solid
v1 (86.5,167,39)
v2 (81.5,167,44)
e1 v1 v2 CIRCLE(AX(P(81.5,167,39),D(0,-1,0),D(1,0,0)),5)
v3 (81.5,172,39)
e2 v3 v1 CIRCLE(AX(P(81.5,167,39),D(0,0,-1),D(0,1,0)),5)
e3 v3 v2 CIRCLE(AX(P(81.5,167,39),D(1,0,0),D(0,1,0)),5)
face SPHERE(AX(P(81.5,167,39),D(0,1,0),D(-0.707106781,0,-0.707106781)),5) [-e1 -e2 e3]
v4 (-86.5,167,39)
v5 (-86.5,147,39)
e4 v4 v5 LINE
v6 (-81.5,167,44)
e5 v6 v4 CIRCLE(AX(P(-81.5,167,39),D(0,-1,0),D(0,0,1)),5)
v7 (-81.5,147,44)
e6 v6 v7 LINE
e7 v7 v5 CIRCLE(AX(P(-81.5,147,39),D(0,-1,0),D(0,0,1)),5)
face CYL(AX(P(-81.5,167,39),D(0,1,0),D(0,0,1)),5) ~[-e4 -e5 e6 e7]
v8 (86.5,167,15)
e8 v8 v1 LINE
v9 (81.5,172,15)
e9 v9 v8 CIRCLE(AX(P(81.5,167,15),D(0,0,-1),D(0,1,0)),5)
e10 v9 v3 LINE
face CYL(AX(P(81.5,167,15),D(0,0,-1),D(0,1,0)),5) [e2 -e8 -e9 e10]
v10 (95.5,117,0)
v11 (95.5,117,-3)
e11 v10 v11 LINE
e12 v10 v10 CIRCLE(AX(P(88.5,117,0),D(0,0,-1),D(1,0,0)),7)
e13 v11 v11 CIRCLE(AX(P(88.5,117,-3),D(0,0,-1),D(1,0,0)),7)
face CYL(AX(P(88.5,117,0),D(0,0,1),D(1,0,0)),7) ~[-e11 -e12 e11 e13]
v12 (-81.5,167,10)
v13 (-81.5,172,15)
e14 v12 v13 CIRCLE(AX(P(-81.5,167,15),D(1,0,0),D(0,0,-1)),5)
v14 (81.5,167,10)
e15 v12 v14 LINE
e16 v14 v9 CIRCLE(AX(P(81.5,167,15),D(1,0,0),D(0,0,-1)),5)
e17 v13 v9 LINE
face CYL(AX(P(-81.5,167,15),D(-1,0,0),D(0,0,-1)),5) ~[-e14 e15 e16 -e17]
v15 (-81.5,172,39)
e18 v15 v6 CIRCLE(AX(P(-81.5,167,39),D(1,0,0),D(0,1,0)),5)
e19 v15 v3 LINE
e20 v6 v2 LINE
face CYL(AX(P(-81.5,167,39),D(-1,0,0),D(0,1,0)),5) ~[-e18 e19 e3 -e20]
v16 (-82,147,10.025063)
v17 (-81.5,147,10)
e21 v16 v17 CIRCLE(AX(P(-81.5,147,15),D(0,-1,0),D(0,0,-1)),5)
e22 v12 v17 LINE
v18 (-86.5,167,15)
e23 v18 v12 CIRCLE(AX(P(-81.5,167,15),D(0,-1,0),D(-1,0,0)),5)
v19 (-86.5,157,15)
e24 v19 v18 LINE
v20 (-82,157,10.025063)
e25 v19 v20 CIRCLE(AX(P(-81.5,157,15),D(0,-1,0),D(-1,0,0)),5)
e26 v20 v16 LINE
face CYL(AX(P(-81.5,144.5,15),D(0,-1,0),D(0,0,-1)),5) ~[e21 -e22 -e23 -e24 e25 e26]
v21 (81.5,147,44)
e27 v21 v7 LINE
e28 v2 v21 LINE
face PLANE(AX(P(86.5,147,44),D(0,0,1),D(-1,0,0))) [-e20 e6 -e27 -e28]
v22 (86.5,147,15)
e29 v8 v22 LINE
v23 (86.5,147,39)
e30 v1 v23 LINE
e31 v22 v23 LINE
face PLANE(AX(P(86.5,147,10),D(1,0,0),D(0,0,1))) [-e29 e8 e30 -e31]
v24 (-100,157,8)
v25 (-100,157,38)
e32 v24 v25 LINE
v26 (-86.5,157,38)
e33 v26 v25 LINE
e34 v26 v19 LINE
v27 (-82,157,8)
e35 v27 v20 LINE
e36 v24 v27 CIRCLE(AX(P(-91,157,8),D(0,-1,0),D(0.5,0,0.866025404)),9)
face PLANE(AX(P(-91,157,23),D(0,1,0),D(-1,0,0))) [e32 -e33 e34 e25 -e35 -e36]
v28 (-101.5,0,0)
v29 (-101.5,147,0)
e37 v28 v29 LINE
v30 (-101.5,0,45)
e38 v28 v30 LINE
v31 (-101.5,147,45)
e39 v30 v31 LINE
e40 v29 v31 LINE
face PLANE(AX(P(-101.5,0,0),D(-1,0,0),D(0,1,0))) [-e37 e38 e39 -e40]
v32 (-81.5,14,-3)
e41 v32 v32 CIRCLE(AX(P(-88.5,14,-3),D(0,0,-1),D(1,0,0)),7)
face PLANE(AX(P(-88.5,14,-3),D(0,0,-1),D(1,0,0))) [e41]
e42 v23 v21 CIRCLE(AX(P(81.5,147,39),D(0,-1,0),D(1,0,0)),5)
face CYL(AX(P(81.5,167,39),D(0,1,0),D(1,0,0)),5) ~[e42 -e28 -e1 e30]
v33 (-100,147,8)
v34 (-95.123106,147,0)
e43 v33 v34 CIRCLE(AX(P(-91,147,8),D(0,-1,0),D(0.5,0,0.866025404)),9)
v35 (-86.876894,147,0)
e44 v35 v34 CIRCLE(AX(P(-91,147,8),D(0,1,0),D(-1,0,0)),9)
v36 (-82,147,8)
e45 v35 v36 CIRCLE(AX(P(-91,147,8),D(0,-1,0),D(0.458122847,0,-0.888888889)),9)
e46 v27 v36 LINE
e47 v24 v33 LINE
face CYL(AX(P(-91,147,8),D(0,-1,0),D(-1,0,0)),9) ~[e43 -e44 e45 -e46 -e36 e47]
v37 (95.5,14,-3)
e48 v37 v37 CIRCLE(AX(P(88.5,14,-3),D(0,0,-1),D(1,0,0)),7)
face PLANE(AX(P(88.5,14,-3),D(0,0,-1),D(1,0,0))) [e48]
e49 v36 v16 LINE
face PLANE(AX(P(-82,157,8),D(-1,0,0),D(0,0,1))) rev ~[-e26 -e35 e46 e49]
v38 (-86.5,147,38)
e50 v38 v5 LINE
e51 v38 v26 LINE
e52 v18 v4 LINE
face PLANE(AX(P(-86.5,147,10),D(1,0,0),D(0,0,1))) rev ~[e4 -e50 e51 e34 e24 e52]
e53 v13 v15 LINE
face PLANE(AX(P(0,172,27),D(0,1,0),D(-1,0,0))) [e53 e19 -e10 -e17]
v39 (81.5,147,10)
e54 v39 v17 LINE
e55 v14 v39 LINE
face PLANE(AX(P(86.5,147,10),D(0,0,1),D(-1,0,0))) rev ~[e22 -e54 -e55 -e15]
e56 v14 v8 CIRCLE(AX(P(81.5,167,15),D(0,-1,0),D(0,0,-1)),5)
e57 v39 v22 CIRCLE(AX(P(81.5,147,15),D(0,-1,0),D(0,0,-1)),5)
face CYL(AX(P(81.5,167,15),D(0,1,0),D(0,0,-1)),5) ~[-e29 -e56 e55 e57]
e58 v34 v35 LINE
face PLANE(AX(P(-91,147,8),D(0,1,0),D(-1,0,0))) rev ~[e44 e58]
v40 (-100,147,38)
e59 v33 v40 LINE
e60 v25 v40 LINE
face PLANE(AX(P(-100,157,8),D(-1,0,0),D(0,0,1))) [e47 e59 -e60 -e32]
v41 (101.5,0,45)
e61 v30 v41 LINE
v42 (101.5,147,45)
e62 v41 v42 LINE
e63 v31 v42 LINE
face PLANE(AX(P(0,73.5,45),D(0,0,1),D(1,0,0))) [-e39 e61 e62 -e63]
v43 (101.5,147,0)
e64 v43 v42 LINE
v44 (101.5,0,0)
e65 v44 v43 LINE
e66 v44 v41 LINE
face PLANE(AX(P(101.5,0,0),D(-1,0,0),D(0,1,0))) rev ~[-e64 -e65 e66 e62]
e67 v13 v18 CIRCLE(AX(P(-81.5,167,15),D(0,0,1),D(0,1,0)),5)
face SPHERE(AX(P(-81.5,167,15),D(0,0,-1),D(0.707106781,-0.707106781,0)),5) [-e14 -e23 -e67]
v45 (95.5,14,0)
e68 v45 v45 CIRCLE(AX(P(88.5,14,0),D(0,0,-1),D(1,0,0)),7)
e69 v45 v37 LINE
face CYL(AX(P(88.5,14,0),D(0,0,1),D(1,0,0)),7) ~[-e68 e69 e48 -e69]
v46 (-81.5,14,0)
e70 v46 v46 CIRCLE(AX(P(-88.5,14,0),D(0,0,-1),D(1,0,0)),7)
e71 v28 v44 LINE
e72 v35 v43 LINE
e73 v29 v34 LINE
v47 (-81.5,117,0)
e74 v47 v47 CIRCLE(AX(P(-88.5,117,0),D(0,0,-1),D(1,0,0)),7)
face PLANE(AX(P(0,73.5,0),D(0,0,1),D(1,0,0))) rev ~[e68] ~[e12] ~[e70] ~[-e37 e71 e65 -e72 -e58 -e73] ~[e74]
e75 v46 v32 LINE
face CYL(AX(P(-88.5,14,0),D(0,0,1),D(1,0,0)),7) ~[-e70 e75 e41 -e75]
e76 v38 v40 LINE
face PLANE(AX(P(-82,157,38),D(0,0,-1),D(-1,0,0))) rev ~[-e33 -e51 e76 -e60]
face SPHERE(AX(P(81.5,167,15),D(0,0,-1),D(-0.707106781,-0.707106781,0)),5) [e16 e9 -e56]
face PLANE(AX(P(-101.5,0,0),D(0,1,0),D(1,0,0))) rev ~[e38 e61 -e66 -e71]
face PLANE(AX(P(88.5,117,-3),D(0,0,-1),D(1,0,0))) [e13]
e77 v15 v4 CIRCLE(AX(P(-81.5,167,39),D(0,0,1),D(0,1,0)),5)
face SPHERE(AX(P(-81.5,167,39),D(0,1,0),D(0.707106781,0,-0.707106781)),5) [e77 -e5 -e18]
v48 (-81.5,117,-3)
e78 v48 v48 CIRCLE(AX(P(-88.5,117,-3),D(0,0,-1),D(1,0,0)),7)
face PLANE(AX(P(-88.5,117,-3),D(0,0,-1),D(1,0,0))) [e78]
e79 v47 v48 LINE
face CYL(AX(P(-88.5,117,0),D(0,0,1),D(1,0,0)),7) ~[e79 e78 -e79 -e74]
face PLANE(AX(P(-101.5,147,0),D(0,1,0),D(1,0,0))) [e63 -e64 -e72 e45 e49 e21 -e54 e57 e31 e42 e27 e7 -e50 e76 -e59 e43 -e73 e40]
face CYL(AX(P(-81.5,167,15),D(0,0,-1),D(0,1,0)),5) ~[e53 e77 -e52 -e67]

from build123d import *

# Parameters (mm, degrees)
F0_W         = 203
F0_H         = 147
F1_DEPTH     = 45
F2_R         = 7
F3_DEPTH     = 3
F4_R         = 9
F5_DEPTH     = 10
F6_W         = 173
F6_H         = 34
F7_DEPTH     = 25
F8_T1_DEPTH  = 163
F8_T3_DEPTH  = 24
F8_T5_DEPTH  = 20
F8_S9_W      = 5
F8_S9_H      = 5
F8_T10_DEPTH = 5
F8_S15_W     = 5
F8_S15_H     = 5
F8_T16_DEPTH = 5
F8_S21_W     = 5
F8_S21_H     = 5
F8_T22_DEPTH = 5
F8_S27_W     = 5
F8_S27_H     = 5
F8_T28_DEPTH = 5
F8_T34_DEPTH = 22.5
F8_S36_R     = 9
F8_T37_DEPTH = 13
F8_T42_DEPTH = 10
F8_S43_R     = 9
F8_T44_DEPTH = 8
F8_T48_DEPTH = 10
F8_S49_R     = 9
F8_T50_DEPTH = 8
F9_W         = 18
F9_H         = 30
F10_DEPTH    = 10


# Not quite as in the source:
# - a fillet or chamfer that OpenCascade refuses, or shapes differently, is made with other operations: its cross-section is extruded or revolved along the edge and cut away or added


with BuildPart() as f1:
    # F0 (on Top) → F1 (new body)
    with BuildSketch(Plane.XY):
        with Locations((0, 73.5)):
            Rectangle(F0_W, F0_H)
    extrude(amount=F1_DEPTH)

    # F2 (on face) → F3 (join)
    with BuildSketch(Plane(origin=(0, 0, 0), x_dir=(1, 0, 0), z_dir=(0, 0, -1))):
        with Locations((-88.5, -14)):
            Circle(F2_R)
        with Locations((-88.5, -117)):
            Circle(F2_R)
        with Locations((88.5, -14)):
            Circle(F2_R)
        with Locations((88.5, -117)):
            Circle(F2_R)
    extrude(amount=F3_DEPTH)

    # F4 (on face) → F5 (join)
    with BuildSketch(Plane(origin=(0, 147, 0), x_dir=(-1, 0, 0), z_dir=(0, 1, 0))):
        with Locations((91, 8)):
            Circle(F4_R)
    extrude(amount=F5_DEPTH)

    # F6 (on face) → F7 (join)
    with BuildSketch(Plane(origin=(0, 147, 0), x_dir=(-1, 0, 0), z_dir=(0, 1, 0))):
        with Locations((0, 27)):
            Rectangle(F6_W, F6_H)
    extrude(amount=F7_DEPTH)

    # F8: fillet of radius 5 on 8 edges, made by hand

    # F8_s2 → F8_t1 (cut)
    with BuildSketch(Plane.YZ.offset(-81.5)):
        with BuildLine():
            ThreePointArc((172, 39), (170.5355339059, 42.5355339059), (167, 44))
            Line((167, 44), (172, 44))
            Line((172, 44), (172, 39))
        make_face()
        with BuildLine():
            ThreePointArc((167, 10), (170.5355339059, 11.4644660941), (172, 15))
            Line((172, 15), (172, 10))
            Line((172, 10), (167, 10))
        make_face()
    extrude(amount=F8_T1_DEPTH, mode=Mode.SUBTRACT)

    # F8_s4 → F8_t3 (cut)
    with BuildSketch(Plane.XY.offset(15)):
        with BuildLine():
            ThreePointArc((81.5, 172), (85.0355339059, 170.5355339059), (86.5, 167))
            Line((86.5, 167), (86.5, 172))
            Line((86.5, 172), (81.5, 172))
        make_face()
        with BuildLine():
            ThreePointArc((-81.5, 172), (-85.0355339059, 170.5355339059), (-86.5, 167))
            Line((-86.5, 167), (-86.5, 172))
            Line((-86.5, 172), (-81.5, 172))
        make_face()
    extrude(amount=F8_T3_DEPTH, mode=Mode.SUBTRACT)

    # F8_s6 → F8_t5 (cut)
    with BuildSketch(Plane.XZ.offset(-167)):
        with BuildLine():
            ThreePointArc((86.5, 39), (85.0355339059, 42.5355339059), (81.5, 44))
            Line((81.5, 44), (86.5, 44))
            Line((86.5, 44), (86.5, 39))
        make_face()
        with BuildLine():
            ThreePointArc((81.5, 10), (85.0355339059, 11.4644660941), (86.5, 15))
            Line((86.5, 15), (86.5, 10))
            Line((86.5, 10), (81.5, 10))
        make_face()
        with BuildLine():
            ThreePointArc((-81.5, 44), (-85.0355339059, 42.5355339059), (-86.5, 39))
            Line((-86.5, 39), (-86.5, 44))
            Line((-86.5, 44), (-81.5, 44))
        make_face()
    extrude(amount=F8_T5_DEPTH, mode=Mode.SUBTRACT)


with BuildPart() as f8_tool8:
    # F8_s9 → F8_t10 (new body)
    with BuildSketch(Plane.XZ.offset(-167)):
        with Locations((-84, 41.5)):
            Rectangle(F8_S9_W, F8_S9_H)
    extrude(amount=-F8_T10_DEPTH)

    # F8_s11 → F8_t12 (revolve, cut)
    with BuildSketch(Plane(origin=(-81.5, 167, 39), x_dir=(0.7071067812, 0, -0.7071067812), z_dir=(0.7071067812, 0, 0.7071067812))):
        with BuildLine():
            ThreePointArc((0, -5), (5, 0), (0, 5))
            Line((0, 5), (0, -5))
        make_face()
    revolve(axis=Axis((-81.5, 167, 39), (0, 1, 0)), mode=Mode.SUBTRACT)


with BuildPart() as f1_1:
    add(f1.part)

    # F8_t7: cut F8_tool8
    add(f8_tool8.part, mode=Mode.SUBTRACT)


with BuildPart() as f8_tool14:
    # F8_s15 → F8_t16 (new body)
    with BuildSketch(Plane.XZ.offset(-167)):
        with Locations((84, 41.5)):
            Rectangle(F8_S15_W, F8_S15_H)
    extrude(amount=-F8_T16_DEPTH)

    # F8_s17 → F8_t18 (revolve, cut)
    with BuildSketch(Plane(origin=(81.5, 167, 39), x_dir=(-0.7071067812, 0, -0.7071067812), z_dir=(0.7071067812, 0, -0.7071067812))):
        with BuildLine():
            ThreePointArc((0, -5), (5, 0), (0, 5))
            Line((0, 5), (0, -5))
        make_face()
    revolve(axis=Axis((81.5, 167, 39), (0, 1, 0)), mode=Mode.SUBTRACT)


with BuildPart() as f1_2:
    add(f1_1.part)

    # F8_t13: cut F8_tool14
    add(f8_tool14.part, mode=Mode.SUBTRACT)


with BuildPart() as f8_tool20:
    # F8_s21 → F8_t22 (new body)
    with BuildSketch(Plane.XY.offset(15)):
        with Locations((84, 169.5)):
            Rectangle(F8_S21_W, F8_S21_H)
    extrude(amount=-F8_T22_DEPTH)

    # F8_s23 → F8_t24 (revolve, cut)
    with BuildSketch(Plane(origin=(81.5, 167, 15), x_dir=(-0.7071067812, -0.7071067812, 0), z_dir=(0.7071067812, -0.7071067812, 0))):
        with BuildLine():
            ThreePointArc((0, -5), (5, 0), (0, 5))
            Line((0, 5), (0, -5))
        make_face()
    revolve(axis=Axis((81.5, 167, 15), (0, 0, -1)), mode=Mode.SUBTRACT)


with BuildPart() as f1_3:
    add(f1_2.part)

    # F8_t19: cut F8_tool20
    add(f8_tool20.part, mode=Mode.SUBTRACT)


with BuildPart() as f8_tool26:
    # F8_s27 → F8_t28 (new body)
    with BuildSketch(Plane.XY.offset(15)):
        with Locations((-84, 169.5)):
            Rectangle(F8_S27_W, F8_S27_H)
    extrude(amount=-F8_T28_DEPTH)

    # F8_s29 → F8_t30 (revolve, cut)
    with BuildSketch(Plane(origin=(-81.5, 167, 15), x_dir=(0.7071067812, -0.7071067812, 0), z_dir=(0.7071067812, 0.7071067812, 0))):
        with BuildLine():
            ThreePointArc((0, -5), (5, 0), (0, 5))
            Line((0, 5), (0, -5))
        make_face()
    revolve(axis=Axis((-81.5, 167, 15), (0, 0, -1)), mode=Mode.SUBTRACT)


with BuildPart() as f1_4:
    add(f1_3.part)

    # F8_t25: cut F8_tool26
    add(f8_tool26.part, mode=Mode.SUBTRACT)


with BuildPart() as f8_tool32:
    # F8_s33 → F8_t34 (new body)
    with BuildSketch(Plane.XZ.offset(-144.5)):
        with BuildLine():
            ThreePointArc((-81.5, 10), (-85.0355339059, 11.4644660941), (-86.5, 15))
            Line((-86.5, 15), (-86.5, 10))
            Line((-86.5, 10), (-81.5, 10))
        make_face()
    extrude(amount=-F8_T34_DEPTH)

    split(bisect_by=Plane.XZ.offset(-147), keep=Keep.BOTTOM)

    # F8_s36 → F8_t37 (cut, symmetric)
    with BuildSketch(Plane.XZ.offset(-155.8)):
        with Locations((-91, 8)):
            Circle(F8_S36_R)
    extrude(amount=F8_T37_DEPTH, both=True, mode=Mode.SUBTRACT)

    split(bisect_by=Plane.XZ.offset(-157), keep=Keep.TOP)


with BuildPart() as f1_5:
    add(f1_4.part)

    # F8_t31: cut F8_tool32
    add(f8_tool32.part, mode=Mode.SUBTRACT)


with BuildPart() as f8_tool40:
    # F8_s41 → F8_t42 (new body)
    with BuildSketch(Plane.XZ.offset(-157)):
        with BuildLine():
            ThreePointArc((-81.5, 10), (-85.0355339059, 11.4644660941), (-86.5, 15))
            Line((-86.5, 15), (-86.5, 10))
            Line((-86.5, 10), (-81.5, 10))
        make_face()
    extrude(amount=-F8_T42_DEPTH)

    # F8_s43 → F8_t44 (cut, symmetric)
    with BuildSketch(Plane.XZ.offset(-162)):
        with Locations((-91, 8)):
            Circle(F8_S43_R)
    extrude(amount=F8_T44_DEPTH, both=True, mode=Mode.SUBTRACT)


with BuildPart() as f1_6:
    add(f1_5.part)

    # F8_t39: cut F8_tool40
    add(f8_tool40.part, mode=Mode.SUBTRACT)


with BuildPart() as f8_tool46:
    # F8_s47 → F8_t48 (new body)
    with BuildSketch(Plane.XZ.offset(-157)):
        with BuildLine():
            ThreePointArc((-81.5, 10), (-85.0355339059, 11.4644660941), (-86.5, 15))
            Line((-86.5, 15), (-86.5, 10))
            Line((-86.5, 10), (-81.5, 10))
        make_face()
    extrude(amount=-F8_T48_DEPTH)

    # F8_s49 → F8_t50 (intersect, symmetric)
    with BuildSketch(Plane.XZ.offset(-162)):
        with Locations((-91, 8)):
            Circle(F8_S49_R)
    extrude(amount=F8_T50_DEPTH, both=True, mode=Mode.INTERSECT)


with BuildPart() as f1_7:
    add(f1_6.part)

    # F8_t45: cut F8_tool46
    add(f8_tool46.part, mode=Mode.SUBTRACT)

    # F9 (on face) → F10 (join, through all)
    with BuildSketch(Plane(origin=(0, 157, 0), x_dir=(-1, 0, 0), z_dir=(0, 1, 0))):
        with Locations((91, 23)):
            Rectangle(F9_W, F9_H)
    extrude(amount=-F10_DEPTH)


solid = f1_7.part
